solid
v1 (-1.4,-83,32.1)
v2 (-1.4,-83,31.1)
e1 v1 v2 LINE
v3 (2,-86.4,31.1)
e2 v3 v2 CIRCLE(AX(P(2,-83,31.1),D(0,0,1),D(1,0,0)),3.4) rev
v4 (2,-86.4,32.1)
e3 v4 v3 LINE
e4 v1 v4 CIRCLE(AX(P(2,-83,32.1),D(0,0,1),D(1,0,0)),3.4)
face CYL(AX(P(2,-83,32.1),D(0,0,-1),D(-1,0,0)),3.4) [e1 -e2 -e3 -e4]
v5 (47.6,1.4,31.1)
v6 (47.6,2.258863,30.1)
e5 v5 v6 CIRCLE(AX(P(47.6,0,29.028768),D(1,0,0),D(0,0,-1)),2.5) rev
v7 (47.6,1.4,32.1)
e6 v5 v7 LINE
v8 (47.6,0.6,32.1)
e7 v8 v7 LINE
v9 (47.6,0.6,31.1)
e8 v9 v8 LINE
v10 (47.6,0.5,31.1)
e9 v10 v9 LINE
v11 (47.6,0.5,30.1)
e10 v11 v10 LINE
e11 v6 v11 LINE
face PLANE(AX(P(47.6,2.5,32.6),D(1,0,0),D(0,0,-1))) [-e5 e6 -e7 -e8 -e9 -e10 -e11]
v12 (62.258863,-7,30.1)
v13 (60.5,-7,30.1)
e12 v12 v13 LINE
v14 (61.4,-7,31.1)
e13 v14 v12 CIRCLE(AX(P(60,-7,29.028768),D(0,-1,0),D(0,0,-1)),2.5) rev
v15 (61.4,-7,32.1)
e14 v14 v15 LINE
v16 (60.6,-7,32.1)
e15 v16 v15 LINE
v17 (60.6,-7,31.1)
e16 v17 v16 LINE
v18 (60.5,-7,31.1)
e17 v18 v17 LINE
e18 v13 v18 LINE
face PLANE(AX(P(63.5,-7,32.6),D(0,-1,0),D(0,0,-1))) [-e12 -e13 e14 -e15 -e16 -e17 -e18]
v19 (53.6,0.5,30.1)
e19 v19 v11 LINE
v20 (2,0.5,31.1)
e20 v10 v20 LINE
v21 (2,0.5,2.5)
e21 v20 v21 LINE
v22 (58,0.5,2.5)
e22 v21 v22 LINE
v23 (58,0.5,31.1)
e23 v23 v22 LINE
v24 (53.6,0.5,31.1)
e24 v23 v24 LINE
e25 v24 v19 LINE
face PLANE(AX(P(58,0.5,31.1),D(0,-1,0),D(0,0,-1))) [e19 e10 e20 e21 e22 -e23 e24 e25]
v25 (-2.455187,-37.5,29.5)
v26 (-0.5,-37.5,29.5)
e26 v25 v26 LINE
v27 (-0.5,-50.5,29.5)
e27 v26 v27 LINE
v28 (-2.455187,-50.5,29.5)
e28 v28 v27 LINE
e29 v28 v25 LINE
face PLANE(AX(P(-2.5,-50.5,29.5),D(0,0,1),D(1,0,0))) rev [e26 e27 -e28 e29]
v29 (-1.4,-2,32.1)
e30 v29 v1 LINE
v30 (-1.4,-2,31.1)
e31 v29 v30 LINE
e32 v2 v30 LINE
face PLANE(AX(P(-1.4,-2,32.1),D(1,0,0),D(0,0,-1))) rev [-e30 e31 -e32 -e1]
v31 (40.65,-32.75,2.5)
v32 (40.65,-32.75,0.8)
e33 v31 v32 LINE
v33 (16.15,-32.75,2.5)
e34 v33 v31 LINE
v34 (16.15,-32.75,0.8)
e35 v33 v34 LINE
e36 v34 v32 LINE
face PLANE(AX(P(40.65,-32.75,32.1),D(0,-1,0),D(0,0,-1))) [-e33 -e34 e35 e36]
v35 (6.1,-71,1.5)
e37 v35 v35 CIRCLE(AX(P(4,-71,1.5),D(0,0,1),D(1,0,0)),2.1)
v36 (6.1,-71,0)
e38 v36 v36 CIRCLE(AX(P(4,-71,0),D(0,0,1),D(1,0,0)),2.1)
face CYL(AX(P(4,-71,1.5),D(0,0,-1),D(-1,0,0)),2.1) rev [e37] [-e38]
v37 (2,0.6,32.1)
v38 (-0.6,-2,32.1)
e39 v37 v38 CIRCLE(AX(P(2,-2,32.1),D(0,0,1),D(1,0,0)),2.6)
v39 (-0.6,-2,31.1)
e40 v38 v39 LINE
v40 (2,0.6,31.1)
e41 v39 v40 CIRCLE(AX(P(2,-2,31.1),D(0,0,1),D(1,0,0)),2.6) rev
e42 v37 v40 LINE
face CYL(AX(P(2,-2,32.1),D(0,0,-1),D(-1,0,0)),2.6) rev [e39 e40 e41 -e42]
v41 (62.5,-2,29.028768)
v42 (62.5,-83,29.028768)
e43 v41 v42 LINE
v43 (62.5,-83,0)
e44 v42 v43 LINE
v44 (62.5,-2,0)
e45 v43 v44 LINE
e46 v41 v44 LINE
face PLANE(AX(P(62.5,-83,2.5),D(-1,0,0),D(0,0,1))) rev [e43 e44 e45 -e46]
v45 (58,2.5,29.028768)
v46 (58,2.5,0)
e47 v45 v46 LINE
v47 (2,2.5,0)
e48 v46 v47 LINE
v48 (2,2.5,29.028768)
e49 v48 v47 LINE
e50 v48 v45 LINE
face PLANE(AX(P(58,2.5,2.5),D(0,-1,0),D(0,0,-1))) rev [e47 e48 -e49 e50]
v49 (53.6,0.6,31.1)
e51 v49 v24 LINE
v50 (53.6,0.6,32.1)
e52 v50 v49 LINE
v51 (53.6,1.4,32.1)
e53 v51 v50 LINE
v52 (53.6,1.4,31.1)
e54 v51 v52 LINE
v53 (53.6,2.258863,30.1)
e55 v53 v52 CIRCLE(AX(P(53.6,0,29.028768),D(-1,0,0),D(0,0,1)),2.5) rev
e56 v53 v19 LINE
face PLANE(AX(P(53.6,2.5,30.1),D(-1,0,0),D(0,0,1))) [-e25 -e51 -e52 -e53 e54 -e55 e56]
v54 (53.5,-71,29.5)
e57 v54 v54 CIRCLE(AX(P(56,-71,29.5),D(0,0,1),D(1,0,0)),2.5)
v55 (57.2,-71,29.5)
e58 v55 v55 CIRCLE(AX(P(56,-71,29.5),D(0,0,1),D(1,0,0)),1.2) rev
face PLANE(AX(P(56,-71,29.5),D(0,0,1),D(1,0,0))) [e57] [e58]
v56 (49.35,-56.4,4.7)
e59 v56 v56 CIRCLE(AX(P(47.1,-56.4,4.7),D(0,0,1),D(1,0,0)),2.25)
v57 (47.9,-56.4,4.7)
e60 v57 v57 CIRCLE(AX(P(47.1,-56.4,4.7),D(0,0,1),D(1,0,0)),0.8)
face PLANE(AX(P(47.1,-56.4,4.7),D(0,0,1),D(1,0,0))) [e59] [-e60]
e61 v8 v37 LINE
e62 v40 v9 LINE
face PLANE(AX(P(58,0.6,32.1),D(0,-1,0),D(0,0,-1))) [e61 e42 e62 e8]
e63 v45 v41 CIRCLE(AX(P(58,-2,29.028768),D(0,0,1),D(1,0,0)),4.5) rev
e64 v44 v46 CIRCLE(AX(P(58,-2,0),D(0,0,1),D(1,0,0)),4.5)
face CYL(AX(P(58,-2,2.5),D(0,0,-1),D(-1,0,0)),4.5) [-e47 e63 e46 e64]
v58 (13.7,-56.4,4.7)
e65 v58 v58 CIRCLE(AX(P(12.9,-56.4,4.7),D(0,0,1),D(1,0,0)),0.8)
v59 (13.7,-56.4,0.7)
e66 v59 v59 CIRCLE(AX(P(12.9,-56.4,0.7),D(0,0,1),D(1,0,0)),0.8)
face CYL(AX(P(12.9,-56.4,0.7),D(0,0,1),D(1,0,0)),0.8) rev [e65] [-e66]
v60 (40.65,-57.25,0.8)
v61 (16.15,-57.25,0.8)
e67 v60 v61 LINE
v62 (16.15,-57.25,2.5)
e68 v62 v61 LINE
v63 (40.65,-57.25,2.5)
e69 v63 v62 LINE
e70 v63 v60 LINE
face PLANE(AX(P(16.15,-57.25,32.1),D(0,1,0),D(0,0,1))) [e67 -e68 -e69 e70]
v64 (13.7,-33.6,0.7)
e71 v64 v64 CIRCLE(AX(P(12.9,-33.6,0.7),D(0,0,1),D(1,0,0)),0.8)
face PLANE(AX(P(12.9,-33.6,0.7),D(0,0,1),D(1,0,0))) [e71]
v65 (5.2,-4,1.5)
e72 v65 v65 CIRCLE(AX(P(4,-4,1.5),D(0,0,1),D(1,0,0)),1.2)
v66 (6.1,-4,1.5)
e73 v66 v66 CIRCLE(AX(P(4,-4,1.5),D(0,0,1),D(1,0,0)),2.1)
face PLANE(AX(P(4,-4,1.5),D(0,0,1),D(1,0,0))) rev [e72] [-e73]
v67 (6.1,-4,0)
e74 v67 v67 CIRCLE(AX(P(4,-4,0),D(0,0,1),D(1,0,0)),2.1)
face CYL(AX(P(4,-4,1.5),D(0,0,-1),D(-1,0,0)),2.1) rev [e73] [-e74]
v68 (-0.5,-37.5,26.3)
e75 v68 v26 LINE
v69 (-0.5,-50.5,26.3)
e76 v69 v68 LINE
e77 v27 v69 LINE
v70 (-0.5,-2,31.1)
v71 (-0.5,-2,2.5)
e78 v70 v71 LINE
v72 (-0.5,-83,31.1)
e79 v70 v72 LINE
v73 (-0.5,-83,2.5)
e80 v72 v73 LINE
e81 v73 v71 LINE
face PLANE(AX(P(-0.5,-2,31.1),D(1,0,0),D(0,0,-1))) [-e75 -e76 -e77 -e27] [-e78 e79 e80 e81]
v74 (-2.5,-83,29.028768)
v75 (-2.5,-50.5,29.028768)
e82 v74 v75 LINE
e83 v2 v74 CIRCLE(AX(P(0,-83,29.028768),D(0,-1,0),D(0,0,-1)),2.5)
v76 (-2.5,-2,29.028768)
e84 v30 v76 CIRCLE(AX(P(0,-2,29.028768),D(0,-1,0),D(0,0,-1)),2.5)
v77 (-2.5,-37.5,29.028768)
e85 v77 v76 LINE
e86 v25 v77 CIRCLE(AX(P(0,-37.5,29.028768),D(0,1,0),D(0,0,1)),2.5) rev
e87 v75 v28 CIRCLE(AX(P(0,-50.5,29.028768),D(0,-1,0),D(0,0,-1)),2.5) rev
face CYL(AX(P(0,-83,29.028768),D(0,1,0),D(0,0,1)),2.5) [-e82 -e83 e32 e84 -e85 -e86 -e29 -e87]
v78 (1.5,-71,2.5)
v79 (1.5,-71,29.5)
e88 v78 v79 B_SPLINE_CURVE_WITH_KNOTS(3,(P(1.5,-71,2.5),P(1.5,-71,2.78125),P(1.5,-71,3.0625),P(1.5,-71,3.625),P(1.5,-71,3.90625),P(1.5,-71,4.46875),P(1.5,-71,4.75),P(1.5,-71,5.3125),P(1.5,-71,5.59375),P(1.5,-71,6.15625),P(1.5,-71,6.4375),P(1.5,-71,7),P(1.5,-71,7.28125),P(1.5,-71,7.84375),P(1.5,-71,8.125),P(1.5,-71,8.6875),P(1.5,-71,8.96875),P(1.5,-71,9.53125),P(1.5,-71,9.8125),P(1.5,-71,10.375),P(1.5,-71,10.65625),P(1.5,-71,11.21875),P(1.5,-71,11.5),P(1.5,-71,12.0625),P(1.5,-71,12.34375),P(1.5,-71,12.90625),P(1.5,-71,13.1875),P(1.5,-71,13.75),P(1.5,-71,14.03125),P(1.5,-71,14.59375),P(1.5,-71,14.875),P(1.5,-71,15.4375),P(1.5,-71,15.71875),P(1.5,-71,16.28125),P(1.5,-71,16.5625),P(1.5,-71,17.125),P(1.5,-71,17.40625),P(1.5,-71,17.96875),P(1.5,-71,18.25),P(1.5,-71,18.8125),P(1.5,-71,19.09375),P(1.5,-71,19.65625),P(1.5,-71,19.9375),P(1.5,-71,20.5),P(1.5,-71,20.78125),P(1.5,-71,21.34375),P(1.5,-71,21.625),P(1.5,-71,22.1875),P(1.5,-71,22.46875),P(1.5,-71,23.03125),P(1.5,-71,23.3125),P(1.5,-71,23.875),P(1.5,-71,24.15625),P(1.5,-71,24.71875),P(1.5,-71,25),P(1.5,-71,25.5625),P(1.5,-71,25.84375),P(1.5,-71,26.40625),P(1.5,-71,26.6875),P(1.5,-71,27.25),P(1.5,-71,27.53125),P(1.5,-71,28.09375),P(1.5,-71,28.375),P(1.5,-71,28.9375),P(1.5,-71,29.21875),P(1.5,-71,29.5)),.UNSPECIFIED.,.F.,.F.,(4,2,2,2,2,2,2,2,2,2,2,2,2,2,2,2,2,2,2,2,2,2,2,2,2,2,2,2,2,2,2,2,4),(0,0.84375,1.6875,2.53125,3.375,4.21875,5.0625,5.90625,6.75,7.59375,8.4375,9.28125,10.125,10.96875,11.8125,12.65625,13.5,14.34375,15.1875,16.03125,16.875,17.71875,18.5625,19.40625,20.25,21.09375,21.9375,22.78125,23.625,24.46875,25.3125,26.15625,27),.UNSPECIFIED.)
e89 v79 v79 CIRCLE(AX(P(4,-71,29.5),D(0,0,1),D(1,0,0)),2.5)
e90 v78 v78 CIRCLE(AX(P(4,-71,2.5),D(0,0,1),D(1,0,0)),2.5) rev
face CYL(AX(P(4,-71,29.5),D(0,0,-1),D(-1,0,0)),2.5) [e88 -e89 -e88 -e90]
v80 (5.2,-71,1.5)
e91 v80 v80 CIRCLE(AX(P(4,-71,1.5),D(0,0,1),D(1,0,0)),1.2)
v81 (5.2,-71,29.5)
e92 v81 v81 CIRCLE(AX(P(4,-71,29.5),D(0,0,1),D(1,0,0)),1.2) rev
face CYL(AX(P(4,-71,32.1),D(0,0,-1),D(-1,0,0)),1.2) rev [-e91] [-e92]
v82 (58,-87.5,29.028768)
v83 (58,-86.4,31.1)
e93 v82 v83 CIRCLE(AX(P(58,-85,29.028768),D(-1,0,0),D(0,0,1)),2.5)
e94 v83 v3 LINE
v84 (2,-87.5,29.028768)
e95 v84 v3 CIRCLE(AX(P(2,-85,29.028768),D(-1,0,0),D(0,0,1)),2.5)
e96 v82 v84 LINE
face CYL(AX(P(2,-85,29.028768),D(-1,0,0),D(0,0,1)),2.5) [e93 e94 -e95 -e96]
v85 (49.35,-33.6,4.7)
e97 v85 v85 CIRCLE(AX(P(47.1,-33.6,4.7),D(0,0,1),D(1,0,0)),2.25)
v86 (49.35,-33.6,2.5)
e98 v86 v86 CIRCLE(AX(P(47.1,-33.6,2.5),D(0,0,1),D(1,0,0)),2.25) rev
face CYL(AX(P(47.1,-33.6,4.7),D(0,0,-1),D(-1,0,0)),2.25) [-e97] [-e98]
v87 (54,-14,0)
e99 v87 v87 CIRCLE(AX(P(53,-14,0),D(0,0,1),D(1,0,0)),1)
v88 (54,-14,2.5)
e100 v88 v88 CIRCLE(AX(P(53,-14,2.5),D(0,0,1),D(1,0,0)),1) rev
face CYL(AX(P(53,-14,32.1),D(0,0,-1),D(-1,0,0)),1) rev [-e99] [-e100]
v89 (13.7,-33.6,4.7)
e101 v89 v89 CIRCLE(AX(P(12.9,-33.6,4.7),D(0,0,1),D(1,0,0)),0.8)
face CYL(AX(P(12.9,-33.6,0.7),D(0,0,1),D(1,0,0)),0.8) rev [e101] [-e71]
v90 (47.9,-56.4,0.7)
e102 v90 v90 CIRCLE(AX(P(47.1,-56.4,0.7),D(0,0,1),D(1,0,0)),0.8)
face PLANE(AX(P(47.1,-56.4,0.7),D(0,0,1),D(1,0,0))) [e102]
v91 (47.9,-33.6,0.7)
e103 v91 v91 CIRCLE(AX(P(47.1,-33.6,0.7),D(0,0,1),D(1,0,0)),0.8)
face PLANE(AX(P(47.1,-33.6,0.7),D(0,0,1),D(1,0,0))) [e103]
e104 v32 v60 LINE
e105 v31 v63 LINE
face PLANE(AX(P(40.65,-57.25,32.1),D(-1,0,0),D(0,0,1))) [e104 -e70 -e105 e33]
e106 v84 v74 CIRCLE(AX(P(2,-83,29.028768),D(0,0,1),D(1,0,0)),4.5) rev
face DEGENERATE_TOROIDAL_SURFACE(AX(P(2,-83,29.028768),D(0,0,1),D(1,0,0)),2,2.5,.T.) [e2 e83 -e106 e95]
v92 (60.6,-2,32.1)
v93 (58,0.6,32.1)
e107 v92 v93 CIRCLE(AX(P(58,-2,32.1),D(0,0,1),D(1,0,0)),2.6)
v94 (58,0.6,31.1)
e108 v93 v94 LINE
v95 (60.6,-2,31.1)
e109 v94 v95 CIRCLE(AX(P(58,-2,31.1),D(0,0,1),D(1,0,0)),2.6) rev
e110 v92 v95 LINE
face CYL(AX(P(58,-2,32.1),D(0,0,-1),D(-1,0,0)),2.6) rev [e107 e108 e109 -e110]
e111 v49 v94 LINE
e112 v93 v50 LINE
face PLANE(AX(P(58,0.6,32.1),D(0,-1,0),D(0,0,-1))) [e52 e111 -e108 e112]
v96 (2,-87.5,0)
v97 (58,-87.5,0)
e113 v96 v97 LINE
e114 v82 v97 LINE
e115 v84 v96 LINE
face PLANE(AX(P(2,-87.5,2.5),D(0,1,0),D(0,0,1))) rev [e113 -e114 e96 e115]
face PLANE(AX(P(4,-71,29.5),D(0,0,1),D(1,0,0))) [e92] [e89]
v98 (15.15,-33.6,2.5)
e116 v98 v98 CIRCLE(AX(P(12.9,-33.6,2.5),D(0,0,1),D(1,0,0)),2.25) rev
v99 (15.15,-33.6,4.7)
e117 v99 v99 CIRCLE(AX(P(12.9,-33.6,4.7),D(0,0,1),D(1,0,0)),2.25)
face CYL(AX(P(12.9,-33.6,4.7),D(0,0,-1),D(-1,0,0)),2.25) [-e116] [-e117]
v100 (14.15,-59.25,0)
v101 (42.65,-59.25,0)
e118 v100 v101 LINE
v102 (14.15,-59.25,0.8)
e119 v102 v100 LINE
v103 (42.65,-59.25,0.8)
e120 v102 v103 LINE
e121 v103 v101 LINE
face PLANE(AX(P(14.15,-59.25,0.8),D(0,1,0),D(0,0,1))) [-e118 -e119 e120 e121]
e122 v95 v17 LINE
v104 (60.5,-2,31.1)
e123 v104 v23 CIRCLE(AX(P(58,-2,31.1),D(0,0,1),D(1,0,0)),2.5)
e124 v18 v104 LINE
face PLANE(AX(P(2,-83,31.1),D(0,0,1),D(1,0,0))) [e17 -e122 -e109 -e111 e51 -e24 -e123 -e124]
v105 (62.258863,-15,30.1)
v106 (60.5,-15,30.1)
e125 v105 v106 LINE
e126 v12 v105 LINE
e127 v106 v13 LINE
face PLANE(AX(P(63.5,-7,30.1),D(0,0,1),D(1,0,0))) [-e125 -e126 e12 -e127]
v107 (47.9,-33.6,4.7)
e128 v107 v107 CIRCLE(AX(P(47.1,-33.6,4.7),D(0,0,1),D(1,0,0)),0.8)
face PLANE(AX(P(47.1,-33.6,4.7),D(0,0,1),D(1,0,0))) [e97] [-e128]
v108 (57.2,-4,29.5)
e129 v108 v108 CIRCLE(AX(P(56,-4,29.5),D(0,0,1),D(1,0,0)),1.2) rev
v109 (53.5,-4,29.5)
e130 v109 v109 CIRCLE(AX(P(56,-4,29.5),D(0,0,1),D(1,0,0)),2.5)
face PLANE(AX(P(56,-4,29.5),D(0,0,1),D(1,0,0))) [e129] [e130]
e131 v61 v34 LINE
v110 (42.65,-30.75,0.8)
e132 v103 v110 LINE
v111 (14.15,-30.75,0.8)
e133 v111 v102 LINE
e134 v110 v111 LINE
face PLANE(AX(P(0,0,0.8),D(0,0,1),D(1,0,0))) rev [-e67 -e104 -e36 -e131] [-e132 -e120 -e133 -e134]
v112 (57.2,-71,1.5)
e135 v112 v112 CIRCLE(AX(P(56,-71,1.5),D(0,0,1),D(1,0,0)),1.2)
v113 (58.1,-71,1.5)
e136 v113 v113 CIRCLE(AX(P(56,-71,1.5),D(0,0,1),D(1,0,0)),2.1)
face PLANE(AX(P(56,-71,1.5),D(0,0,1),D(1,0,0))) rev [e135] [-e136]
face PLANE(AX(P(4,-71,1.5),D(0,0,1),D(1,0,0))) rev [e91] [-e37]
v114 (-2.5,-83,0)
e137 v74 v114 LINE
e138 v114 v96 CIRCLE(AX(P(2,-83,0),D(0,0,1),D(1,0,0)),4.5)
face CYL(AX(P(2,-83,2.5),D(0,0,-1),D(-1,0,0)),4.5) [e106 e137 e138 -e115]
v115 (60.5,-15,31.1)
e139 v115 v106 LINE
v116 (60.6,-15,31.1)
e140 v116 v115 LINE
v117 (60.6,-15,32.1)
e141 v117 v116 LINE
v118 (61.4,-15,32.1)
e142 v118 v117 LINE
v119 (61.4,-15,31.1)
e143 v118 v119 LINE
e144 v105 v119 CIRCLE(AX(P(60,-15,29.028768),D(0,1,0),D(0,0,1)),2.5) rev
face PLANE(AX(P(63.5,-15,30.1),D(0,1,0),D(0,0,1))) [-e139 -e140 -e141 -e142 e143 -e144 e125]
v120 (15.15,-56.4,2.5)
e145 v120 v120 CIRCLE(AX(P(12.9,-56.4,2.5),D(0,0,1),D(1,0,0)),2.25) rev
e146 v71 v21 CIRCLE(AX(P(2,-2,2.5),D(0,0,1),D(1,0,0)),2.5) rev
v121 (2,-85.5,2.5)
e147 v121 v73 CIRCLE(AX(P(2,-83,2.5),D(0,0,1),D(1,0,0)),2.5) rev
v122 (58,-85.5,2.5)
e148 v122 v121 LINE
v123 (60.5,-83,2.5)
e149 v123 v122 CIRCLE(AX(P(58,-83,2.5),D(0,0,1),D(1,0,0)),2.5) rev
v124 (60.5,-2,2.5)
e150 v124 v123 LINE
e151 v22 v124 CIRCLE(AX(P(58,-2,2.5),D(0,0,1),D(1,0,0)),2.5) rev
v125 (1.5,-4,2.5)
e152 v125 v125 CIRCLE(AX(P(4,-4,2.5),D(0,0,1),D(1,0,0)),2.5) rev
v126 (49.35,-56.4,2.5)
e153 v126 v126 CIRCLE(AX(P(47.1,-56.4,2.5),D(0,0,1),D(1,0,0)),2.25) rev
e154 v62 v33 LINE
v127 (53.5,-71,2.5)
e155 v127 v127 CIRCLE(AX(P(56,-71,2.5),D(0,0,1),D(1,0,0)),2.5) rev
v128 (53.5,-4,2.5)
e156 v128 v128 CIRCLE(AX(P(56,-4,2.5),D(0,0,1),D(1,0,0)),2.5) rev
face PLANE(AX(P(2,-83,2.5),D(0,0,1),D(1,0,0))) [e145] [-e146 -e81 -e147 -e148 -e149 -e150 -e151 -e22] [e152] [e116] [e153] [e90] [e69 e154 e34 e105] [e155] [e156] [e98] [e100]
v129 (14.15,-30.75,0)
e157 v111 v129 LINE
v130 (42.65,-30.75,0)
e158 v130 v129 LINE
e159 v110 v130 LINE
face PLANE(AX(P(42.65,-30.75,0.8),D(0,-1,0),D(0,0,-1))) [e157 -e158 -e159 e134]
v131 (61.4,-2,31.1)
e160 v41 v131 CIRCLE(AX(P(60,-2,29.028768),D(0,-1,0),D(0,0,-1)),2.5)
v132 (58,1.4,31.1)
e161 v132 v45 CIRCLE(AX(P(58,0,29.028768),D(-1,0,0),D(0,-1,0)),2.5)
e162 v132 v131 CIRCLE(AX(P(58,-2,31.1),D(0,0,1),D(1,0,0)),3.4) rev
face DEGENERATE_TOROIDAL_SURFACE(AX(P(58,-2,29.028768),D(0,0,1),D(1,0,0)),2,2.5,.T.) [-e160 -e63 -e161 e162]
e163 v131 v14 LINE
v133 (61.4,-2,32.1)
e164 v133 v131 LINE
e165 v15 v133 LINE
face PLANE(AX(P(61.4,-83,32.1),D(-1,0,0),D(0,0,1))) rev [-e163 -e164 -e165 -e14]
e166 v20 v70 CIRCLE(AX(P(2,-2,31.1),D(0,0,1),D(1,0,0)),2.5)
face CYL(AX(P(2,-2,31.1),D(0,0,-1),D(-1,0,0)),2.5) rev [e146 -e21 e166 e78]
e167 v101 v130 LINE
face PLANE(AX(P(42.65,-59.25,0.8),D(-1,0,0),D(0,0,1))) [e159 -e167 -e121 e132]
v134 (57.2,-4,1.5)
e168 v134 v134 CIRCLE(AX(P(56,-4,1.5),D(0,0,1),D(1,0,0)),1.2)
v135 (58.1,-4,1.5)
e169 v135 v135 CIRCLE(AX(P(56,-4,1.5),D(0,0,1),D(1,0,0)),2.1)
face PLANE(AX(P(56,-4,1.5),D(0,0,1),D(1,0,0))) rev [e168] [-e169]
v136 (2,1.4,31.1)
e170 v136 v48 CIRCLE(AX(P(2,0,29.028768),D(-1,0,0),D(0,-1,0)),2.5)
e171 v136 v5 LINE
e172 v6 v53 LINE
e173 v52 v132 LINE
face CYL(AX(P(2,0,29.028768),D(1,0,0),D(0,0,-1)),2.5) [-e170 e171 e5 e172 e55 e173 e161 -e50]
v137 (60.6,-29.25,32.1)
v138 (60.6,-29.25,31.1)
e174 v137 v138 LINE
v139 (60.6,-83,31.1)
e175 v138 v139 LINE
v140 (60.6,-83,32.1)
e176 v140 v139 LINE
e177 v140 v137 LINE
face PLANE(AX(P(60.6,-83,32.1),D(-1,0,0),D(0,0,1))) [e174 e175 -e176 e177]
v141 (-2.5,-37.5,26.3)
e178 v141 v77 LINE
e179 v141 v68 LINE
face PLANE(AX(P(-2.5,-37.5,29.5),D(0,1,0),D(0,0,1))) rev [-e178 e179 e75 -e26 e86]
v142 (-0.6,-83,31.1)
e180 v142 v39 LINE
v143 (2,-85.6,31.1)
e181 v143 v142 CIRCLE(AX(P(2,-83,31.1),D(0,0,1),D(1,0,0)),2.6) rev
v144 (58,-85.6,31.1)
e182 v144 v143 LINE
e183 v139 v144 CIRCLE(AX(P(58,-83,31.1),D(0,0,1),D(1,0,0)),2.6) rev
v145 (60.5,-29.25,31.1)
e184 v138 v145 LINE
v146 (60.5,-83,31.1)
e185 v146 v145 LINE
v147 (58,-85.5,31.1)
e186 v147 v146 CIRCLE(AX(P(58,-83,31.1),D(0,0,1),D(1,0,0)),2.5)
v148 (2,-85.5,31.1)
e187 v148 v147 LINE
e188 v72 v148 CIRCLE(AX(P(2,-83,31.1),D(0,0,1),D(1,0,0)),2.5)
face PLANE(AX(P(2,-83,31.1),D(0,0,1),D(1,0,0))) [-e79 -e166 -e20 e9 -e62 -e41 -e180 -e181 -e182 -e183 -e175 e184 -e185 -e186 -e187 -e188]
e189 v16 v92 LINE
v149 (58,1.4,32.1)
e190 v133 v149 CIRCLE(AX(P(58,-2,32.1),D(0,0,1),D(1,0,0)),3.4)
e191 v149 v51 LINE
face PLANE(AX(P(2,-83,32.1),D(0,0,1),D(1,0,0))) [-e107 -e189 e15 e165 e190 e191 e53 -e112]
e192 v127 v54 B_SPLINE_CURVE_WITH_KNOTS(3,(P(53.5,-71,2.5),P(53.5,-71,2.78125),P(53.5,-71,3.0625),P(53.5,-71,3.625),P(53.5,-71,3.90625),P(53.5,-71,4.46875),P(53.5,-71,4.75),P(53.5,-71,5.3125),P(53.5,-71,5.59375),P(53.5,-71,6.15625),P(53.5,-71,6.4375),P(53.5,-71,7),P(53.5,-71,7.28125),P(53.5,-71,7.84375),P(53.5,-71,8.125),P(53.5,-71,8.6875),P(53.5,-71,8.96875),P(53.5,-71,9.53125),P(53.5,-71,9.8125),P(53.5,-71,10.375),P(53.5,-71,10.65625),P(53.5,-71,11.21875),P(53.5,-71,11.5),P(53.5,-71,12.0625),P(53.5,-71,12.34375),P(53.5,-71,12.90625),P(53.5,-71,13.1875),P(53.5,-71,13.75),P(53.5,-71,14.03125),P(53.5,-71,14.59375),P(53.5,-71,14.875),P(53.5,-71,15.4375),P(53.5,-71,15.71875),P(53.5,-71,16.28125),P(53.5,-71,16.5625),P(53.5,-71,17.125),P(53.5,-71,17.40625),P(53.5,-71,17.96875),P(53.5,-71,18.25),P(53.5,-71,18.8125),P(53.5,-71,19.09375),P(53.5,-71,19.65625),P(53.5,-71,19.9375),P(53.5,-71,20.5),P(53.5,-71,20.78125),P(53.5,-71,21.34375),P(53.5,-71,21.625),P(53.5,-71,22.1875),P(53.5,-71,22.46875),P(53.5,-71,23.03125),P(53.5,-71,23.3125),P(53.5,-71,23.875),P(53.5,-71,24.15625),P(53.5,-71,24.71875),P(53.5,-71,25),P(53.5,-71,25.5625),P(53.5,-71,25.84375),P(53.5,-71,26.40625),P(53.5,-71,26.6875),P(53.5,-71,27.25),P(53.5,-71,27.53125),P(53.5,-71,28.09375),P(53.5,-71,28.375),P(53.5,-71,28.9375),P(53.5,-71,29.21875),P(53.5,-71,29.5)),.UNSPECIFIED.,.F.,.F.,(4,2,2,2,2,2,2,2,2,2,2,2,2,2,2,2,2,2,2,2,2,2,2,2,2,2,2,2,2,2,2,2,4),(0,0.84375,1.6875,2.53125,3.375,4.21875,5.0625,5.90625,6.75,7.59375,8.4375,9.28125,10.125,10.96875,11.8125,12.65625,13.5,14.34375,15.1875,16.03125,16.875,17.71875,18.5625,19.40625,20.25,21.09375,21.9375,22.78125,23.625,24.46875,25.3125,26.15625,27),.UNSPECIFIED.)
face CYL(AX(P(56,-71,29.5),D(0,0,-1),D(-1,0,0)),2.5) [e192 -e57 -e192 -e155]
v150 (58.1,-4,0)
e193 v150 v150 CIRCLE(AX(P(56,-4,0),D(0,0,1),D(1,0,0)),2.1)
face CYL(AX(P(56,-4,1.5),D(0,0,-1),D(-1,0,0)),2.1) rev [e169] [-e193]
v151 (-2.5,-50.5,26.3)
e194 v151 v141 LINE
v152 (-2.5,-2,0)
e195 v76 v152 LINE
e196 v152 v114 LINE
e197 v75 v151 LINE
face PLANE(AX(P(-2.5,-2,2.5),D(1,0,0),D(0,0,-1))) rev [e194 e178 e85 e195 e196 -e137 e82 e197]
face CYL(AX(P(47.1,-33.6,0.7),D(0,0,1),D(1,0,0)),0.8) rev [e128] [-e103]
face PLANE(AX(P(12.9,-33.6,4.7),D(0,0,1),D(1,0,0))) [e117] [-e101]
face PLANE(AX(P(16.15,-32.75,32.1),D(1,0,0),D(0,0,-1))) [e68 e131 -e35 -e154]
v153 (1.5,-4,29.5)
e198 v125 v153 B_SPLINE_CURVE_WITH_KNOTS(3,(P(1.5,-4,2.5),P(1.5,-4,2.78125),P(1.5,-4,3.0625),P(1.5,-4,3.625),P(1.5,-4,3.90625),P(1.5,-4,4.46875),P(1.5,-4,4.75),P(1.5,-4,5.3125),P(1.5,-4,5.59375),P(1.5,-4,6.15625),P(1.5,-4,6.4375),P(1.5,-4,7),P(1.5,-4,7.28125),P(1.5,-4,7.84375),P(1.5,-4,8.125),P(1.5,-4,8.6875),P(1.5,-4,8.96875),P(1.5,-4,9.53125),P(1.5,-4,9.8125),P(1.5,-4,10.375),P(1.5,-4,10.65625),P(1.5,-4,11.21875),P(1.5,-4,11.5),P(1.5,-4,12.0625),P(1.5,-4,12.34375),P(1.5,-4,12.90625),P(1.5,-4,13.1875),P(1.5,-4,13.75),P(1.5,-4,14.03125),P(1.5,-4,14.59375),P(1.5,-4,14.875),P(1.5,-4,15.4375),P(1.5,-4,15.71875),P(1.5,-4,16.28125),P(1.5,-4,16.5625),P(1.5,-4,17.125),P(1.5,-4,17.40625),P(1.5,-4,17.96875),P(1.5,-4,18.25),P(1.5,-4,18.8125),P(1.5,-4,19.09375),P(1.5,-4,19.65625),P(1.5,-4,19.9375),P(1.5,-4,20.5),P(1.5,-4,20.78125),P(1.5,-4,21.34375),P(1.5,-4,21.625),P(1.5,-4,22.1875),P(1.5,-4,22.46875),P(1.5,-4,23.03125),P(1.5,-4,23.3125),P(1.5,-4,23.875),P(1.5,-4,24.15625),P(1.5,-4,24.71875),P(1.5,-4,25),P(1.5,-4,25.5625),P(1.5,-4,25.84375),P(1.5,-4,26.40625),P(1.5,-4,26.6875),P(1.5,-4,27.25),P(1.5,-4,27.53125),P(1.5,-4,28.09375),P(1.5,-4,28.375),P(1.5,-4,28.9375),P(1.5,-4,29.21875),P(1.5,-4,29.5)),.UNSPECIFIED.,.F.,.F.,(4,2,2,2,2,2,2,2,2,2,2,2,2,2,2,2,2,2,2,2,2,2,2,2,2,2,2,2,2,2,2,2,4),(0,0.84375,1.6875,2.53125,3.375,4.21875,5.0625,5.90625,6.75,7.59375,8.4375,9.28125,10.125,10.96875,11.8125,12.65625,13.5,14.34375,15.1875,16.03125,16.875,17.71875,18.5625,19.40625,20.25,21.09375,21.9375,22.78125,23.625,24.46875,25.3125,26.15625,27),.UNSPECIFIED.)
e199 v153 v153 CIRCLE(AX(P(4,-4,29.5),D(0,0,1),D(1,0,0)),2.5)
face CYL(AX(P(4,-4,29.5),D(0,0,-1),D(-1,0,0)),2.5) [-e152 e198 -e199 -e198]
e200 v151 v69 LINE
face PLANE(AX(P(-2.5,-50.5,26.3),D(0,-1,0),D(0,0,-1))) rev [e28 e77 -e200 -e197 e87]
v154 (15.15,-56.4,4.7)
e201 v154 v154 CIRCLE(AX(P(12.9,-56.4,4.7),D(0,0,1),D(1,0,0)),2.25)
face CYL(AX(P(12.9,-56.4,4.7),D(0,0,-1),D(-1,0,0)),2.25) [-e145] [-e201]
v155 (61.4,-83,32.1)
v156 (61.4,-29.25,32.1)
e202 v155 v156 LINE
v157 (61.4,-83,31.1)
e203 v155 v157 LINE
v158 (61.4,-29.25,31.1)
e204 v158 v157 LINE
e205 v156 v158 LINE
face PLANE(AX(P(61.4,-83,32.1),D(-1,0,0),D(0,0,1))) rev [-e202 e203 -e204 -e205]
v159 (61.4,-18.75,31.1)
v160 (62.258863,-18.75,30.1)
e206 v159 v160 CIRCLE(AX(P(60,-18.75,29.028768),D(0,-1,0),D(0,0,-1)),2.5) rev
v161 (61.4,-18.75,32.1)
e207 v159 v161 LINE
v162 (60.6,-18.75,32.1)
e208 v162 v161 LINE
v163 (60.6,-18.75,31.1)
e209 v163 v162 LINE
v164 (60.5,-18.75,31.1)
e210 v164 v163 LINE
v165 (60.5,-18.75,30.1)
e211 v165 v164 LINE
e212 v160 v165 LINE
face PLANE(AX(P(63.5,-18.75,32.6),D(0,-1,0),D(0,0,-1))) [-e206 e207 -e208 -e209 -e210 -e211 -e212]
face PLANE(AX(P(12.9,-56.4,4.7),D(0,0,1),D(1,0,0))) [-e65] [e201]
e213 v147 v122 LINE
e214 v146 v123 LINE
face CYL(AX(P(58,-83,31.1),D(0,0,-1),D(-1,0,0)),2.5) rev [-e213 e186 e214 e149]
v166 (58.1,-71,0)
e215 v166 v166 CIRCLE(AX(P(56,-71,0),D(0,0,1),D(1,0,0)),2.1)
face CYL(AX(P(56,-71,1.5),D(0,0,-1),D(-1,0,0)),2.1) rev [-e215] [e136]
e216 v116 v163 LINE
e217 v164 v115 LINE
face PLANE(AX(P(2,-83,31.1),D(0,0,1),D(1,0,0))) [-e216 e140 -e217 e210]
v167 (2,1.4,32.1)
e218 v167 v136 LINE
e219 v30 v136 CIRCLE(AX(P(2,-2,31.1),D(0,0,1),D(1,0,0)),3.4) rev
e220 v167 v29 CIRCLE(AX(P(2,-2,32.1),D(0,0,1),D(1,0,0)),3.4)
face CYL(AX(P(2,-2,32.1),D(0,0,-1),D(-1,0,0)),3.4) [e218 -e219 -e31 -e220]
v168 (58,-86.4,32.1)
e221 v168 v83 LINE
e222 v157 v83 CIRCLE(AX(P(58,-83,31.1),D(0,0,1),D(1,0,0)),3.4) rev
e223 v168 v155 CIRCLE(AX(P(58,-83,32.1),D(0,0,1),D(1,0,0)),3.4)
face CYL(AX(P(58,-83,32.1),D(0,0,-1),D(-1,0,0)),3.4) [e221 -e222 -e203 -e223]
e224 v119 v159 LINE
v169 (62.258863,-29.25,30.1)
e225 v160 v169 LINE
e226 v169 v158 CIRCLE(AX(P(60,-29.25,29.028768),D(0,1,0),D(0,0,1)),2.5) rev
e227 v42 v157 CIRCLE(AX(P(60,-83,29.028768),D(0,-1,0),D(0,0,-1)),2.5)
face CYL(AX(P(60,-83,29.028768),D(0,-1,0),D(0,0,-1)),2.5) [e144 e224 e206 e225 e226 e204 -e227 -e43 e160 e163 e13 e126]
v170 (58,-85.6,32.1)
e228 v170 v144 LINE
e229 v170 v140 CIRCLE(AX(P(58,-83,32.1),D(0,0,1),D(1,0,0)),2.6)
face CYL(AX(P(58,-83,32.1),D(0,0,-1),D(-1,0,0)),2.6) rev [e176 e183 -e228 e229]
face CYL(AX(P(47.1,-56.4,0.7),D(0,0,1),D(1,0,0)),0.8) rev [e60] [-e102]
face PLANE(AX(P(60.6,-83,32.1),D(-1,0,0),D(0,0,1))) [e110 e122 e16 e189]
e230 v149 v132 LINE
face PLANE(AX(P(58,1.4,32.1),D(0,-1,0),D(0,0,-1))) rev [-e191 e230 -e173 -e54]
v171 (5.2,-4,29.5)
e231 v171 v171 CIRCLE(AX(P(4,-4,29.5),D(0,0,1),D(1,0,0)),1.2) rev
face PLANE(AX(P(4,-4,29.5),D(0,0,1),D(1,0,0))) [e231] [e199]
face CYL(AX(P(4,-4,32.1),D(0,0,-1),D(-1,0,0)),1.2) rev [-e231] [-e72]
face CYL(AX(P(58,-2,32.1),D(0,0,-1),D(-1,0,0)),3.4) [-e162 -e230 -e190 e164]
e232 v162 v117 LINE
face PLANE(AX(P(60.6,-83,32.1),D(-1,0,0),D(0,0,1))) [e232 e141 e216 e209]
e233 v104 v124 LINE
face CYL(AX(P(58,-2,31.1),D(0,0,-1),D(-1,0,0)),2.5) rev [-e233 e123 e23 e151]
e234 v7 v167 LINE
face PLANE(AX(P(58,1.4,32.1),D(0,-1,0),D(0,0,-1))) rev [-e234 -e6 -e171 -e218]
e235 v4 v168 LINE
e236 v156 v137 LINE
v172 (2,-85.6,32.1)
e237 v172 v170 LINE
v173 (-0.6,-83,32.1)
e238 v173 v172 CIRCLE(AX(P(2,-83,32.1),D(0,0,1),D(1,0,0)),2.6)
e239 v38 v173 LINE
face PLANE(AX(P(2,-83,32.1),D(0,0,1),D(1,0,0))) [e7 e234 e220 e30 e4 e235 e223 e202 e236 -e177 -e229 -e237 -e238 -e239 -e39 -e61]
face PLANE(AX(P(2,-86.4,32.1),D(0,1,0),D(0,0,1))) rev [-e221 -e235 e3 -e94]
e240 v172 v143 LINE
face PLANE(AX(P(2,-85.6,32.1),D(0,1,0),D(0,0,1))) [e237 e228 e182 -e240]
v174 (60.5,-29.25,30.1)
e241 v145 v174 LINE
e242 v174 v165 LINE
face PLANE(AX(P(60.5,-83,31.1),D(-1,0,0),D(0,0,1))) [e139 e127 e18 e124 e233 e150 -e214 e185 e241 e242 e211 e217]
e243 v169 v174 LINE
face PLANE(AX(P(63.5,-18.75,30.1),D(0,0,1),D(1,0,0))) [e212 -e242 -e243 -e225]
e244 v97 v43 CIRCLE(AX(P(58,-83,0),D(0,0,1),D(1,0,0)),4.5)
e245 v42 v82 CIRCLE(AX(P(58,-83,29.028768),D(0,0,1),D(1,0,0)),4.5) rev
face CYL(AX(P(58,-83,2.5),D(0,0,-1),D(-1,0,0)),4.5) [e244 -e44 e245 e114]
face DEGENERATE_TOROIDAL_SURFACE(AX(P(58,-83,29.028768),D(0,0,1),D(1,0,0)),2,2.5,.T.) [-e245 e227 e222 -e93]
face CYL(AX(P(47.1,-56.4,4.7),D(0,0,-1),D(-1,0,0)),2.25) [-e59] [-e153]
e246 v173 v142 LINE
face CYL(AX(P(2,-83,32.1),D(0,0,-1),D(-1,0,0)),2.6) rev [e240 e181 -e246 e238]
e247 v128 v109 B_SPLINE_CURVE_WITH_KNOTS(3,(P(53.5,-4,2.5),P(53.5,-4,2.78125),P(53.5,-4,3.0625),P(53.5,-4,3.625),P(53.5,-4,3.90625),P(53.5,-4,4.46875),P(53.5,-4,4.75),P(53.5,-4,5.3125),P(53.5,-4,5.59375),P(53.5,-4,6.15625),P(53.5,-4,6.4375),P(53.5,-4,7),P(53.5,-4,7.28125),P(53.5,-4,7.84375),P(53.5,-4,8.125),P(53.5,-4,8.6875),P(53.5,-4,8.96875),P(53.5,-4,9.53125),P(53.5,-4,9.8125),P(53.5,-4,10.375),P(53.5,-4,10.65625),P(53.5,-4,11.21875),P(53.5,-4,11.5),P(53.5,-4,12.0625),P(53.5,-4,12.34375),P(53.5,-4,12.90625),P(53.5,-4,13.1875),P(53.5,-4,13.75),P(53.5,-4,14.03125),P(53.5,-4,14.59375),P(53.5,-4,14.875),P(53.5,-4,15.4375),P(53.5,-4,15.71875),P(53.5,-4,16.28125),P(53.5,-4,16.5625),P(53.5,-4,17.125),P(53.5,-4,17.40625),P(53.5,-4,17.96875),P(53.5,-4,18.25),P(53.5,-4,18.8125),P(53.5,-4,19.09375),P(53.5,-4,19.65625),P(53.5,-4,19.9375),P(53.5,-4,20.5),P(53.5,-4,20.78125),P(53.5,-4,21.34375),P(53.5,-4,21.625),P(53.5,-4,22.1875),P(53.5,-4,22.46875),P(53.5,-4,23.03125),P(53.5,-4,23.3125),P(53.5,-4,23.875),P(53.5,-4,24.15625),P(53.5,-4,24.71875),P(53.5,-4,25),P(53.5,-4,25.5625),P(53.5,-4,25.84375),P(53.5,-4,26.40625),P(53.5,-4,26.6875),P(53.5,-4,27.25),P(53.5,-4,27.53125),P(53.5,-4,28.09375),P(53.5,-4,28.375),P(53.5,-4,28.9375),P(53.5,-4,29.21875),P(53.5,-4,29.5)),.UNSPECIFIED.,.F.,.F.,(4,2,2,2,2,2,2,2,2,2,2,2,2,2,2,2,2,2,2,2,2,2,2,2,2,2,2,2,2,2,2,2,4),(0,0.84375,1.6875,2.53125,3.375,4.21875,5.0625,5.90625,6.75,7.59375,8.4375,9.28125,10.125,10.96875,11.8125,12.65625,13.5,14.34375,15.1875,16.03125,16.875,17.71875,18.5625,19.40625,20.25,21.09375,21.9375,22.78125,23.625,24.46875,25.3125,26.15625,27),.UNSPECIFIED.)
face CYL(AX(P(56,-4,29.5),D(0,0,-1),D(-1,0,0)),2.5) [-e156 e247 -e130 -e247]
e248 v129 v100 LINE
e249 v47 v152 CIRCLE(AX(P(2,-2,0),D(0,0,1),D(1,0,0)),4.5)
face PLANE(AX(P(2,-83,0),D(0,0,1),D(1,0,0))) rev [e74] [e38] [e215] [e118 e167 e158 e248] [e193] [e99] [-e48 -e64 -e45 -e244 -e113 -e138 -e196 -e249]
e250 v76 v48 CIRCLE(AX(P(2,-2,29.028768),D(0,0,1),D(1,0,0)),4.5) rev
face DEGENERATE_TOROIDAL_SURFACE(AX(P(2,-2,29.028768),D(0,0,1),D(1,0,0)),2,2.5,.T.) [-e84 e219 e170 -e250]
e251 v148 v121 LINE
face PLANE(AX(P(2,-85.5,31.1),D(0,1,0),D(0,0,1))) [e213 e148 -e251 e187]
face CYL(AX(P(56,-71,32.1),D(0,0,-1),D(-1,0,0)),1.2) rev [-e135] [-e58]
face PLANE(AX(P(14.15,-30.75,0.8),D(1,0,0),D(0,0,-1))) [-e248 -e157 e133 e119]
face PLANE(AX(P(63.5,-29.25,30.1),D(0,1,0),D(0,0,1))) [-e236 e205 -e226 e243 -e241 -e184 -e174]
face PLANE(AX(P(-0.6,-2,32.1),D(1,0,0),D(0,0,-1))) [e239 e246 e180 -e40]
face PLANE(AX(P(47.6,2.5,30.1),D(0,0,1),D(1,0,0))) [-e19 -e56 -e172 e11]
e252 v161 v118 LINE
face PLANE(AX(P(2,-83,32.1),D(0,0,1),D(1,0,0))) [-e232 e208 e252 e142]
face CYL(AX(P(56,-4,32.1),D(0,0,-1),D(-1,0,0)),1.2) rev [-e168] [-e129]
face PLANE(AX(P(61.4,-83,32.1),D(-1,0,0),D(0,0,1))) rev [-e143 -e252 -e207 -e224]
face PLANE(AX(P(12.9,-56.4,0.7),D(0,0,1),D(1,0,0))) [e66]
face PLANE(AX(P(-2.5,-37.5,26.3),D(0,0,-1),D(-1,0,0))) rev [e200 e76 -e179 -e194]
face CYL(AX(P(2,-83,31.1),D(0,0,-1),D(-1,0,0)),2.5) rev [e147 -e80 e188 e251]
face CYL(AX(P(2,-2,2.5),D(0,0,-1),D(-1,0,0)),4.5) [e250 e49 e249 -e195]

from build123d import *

# Parameters (mm, degrees)
FLOOR_2_DEPTH                     = 2.5
WALL_OUTER_HALF_DEPTH             = 31.1
WALL_INNER_HALF_DEPTH             = 31.1
LIP_DEPTH                         = 32.1
SCREEN_FACE_ROUND_OVER_R          = 2.5
SKETCH_5_R                        = 2.5
STANDOFFS_DEPTH                   = 29.5
SKETCH_6_R                        = 1.2
SCREW_BORES_DEPTH                 = 113.218135789
SKETCH_7_R                        = 2.1
SCREW_HEAD_RECESSES_DEPTH         = 1.5
SKETCH_8_R                        = 2.25
DISPLAY_POSTS_DEPTH               = 4.7
DISPLAY_START                     = 4.7
SKETCH_9_R                        = 0.8
DISPLAY_POST_PILOT_HOLES_M2_DEPTH = 4
SKETCH_10_W                       = 28.5
SKETCH_10_H                       = 28.5
SCREEN_FRAME_RECESS_DEPTH         = 0.8
SKETCH_11_W                       = 24.5
SKETCH_11_H                       = 24.5
DISPLAY_WINDOW_DEPTH              = 113.218135789
SKETCH_12_R                       = 1
CHARGE_LED_HOLE_D2_DEPTH          = 113.218135789
SKETCH_13_W                       = 3.2
SKETCH_13_H                       = 13
MICROSD_SLOT_DEPTH                = 113.218135789
USB_C_START                       = 59
SKETCH_14_W                       = 2.5
SKETCH_14_H                       = 10.5
USB_C_LIP_NOTCH_DEPTH             = 4.5
SWITCH_START                      = 59
SKETCH_15_W                       = 2.5
SKETCH_15_H                       = 8
SWITCH_LIP_NOTCH_DEPTH            = 4.5
SKETCH_16_W                       = 6
SKETCH_16_H                       = 2.5
SHUTTER_LIP_NOTCH_DEPTH           = 113.218135789


with BuildPart() as part:
    # 草圖1 → floor 2 (new body)
    with BuildSketch(Plane.XY):
        with BuildLine():
            Line((2, -87.5), (58, -87.5))
            ThreePointArc((58, -87.5), (61.181980515, -86.181980515), (62.5, -83))
            Line((62.5, -83), (62.5, -2))
            ThreePointArc((62.5, -2), (61.181980515, 1.181980515), (58, 2.5))
            Line((58, 2.5), (2, 2.5))
            ThreePointArc((2, 2.5), (-1.181980515, 1.181980515), (-2.5, -2))
            Line((-2.5, -2), (-2.5, -83))
            ThreePointArc((-2.5, -83), (-1.181980515, -86.181980515), (2, -87.5))
        make_face()
    extrude(amount=FLOOR_2_DEPTH)

    # 草圖2 → wall outer half (add)
    with BuildSketch(Plane.XY):
        with BuildLine():
            Line((2, -87.5), (58, -87.5))
            ThreePointArc((58, -87.5), (61.181980515, -86.181980515), (62.5, -83))
            Line((62.5, -83), (62.5, -2))
            ThreePointArc((62.5, -2), (61.181980515, 1.181980515), (58, 2.5))
            Line((58, 2.5), (2, 2.5))
            ThreePointArc((2, 2.5), (-1.181980515, 1.181980515), (-2.5, -2))
            Line((-2.5, -2), (-2.5, -83))
            ThreePointArc((-2.5, -83), (-1.181980515, -86.181980515), (2, -87.5))
        make_face()
        with BuildLine():
            Line((2, -86.5), (58, -86.5))
            ThreePointArc((58, -86.5), (60.474873734, -85.474873734), (61.5, -83))
            Line((61.5, -83), (61.5, -2))
            ThreePointArc((61.5, -2), (60.474873734, 0.474873734), (58, 1.5))
            Line((58, 1.5), (2, 1.5))
            ThreePointArc((2, 1.5), (-0.474873734, 0.474873734), (-1.5, -2))
            Line((-1.5, -2), (-1.5, -83))
            ThreePointArc((-1.5, -83), (-0.474873734, -85.474873734), (2, -86.5))
        make_face(mode=Mode.SUBTRACT)
    extrude(amount=WALL_OUTER_HALF_DEPTH)

    # 草圖3 → wall inner half (add)
    with BuildSketch(Plane.XY):
        with BuildLine():
            Line((2, -86.5), (58, -86.5))
            ThreePointArc((58, -86.5), (60.474873734, -85.474873734), (61.5, -83))
            Line((61.5, -83), (61.5, -2))
            ThreePointArc((61.5, -2), (60.474873734, 0.474873734), (58, 1.5))
            Line((58, 1.5), (2, 1.5))
            ThreePointArc((2, 1.5), (-0.474873734, 0.474873734), (-1.5, -2))
            Line((-1.5, -2), (-1.5, -83))
            ThreePointArc((-1.5, -83), (-0.474873734, -85.474873734), (2, -86.5))
        make_face()
        with BuildLine():
            Line((2, -85.5), (58, -85.5))
            ThreePointArc((58, -85.5), (59.767766953, -84.767766953), (60.5, -83))
            Line((60.5, -83), (60.5, -2))
            ThreePointArc((60.5, -2), (59.767766953, -0.232233047), (58, 0.5))
            Line((58, 0.5), (2, 0.5))
            ThreePointArc((2, 0.5), (0.232233047, -0.232233047), (-0.5, -2))
            Line((-0.5, -2), (-0.5, -83))
            ThreePointArc((-0.5, -83), (0.232233047, -84.767766953), (2, -85.5))
        make_face(mode=Mode.SUBTRACT)
    extrude(amount=WALL_INNER_HALF_DEPTH)

    # 草圖4 → lip (add)
    with BuildSketch(Plane.XY):
        with BuildLine():
            Line((2, -86.4), (58, -86.4))
            ThreePointArc((58, -86.4), (60.404163056, -85.404163056), (61.4, -83))
            Line((61.4, -83), (61.4, -2))
            ThreePointArc((61.4, -2), (60.404163056, 0.404163056), (58, 1.4))
            Line((58, 1.4), (2, 1.4))
            ThreePointArc((2, 1.4), (-0.404163056, 0.404163056), (-1.4, -2))
            Line((-1.4, -2), (-1.4, -83))
            ThreePointArc((-1.4, -83), (-0.404163056, -85.404163056), (2, -86.4))
        make_face()
        with BuildLine():
            Line((2, -85.6), (58, -85.6))
            ThreePointArc((58, -85.6), (59.838477631, -84.838477631), (60.6, -83))
            Line((60.6, -83), (60.6, -2))
            ThreePointArc((60.6, -2), (59.838477631, -0.161522369), (58, 0.6))
            Line((58, 0.6), (2, 0.6))
            ThreePointArc((2, 0.6), (0.161522369, -0.161522369), (-0.6, -2))
            Line((-0.6, -2), (-0.6, -83))
            ThreePointArc((-0.6, -83), (0.161522369, -84.838477631), (2, -85.6))
        make_face(mode=Mode.SUBTRACT)
    extrude(amount=LIP_DEPTH)

    # screen face round-over
    # the kernel refuses this fillet: 2.5 mm, written as the material it takes off along each edge
    with BuildSketch(Plane(origin=(2, -83, 31.1), x_dir=(-1, 0, 0), z_dir=(0, 1, 0))) as screen_face_round_over_piece_1:
        with BuildLine():
            CenterArc((2, -2.071231518), SCREEN_FACE_ROUND_OVER_R, 0, 55.944202257)
            Line((3.4, 0), (3.428, 0.04142463))
            ThreePointArc((3.428, 0.04142463), (3.95, 0.05), (4.5, 0.05))
            Line((4.5, 0.05), (4.55, 0))
            Line((4.55, 0), (4.55, -2.071231518))
            Line((4.55, -2.071231518), (4.5, -2.071231518))
        make_face()
    revolve(axis=Axis((2, -83, 31.1), (0, 0, 1)), revolution_arc=90, mode=Mode.SUBTRACT)
    with BuildSketch(Plane(origin=(2, -87.5, 31.1), x_dir=(0, 1.0, -2.745278751795259e-12), z_dir=(1, 0, 0)), Plane(origin=(58, 2.5, 31.1), x_dir=(0, -1.0, -2.7452787517952908e-12), z_dir=(-1, 0, 0))) as screen_face_round_over_piece_2:
        with BuildLine():
            CenterArc((2.5, -2.071231518), SCREEN_FACE_ROUND_OVER_R, 124.055797743, 55.944202257)
            Line((0, -2.071231518), (-0.05, -2.071231518))
            Line((-0.05, -2.071231518), (-0.05, 0))
            Line((-0.05, 0), (0, 0.05))
            ThreePointArc((0, 0.05), (0.55, 0.05), (1.072, 0.04142463))
            Line((1.072, 0.04142463), (1.1, 0))
        make_face()
    extrude(amount=56, mode=Mode.SUBTRACT)
    with BuildSketch(Plane(origin=(58, -83, 31.1), x_dir=(0, -1, 0), z_dir=(-1, 0, 0))) as screen_face_round_over_piece_3:
        with BuildLine():
            CenterArc((2, -2.071231518), SCREEN_FACE_ROUND_OVER_R, 0, 55.944202257)
            Line((4.5, -2.071231518), (4.55, -2.071231518))
            Line((4.55, -2.071231518), (4.55, 0))
            Line((4.55, 0), (4.5, 0.05))
            ThreePointArc((4.5, 0.05), (3.95, 0.05), (3.428, 0.04142463))
            Line((3.428, 0.04142463), (3.4, 0))
        make_face()
    revolve(axis=Axis((58, -83, 31.1), (0, 0, 1)), revolution_arc=90, mode=Mode.SUBTRACT)
    with BuildSketch(Plane(origin=(62.5, -83, 31.1), x_dir=(-1.0, 0, -2.7452787517953118e-12), z_dir=(0, 1, 0))) as screen_face_round_over_piece_4:
        with BuildLine():
            CenterArc((2.5, -2.071231518), SCREEN_FACE_ROUND_OVER_R, 124.055797743, 55.944202257)
            Line((0, -2.071231518), (-0.05, -2.071231518))
            Line((-0.05, -2.071231518), (-0.05, 0))
            Line((-0.05, 0), (0, 0.05))
            ThreePointArc((0, 0.05), (0.55, 0.05), (1.072, 0.04142463))
            Line((1.072, 0.04142463), (1.1, 0))
        make_face()
    extrude(amount=81, mode=Mode.SUBTRACT)
    with BuildSketch(Plane(origin=(58, -2, 31.1), x_dir=(1, 0, 0), z_dir=(0, -1, 0))) as screen_face_round_over_piece_5:
        with BuildLine():
            CenterArc((2, -2.071231518), SCREEN_FACE_ROUND_OVER_R, 0, 55.944202257)
            Line((4.5, -2.071231518), (4.55, -2.071231518))
            Line((4.55, -2.071231518), (4.55, 0))
            Line((4.55, 0), (4.5, 0.05))
            ThreePointArc((4.5, 0.05), (3.95, 0.05), (3.428, 0.04142463))
            Line((3.428, 0.04142463), (3.4, 0))
        make_face()
    revolve(axis=Axis((58, -2, 31.1), (0, 0, 1)), revolution_arc=90, mode=Mode.SUBTRACT)
    with BuildSketch(Plane(origin=(2, -2, 31.1), x_dir=(0, 1, 0), z_dir=(1, 0, 0))) as screen_face_round_over_piece_6:
        with BuildLine():
            CenterArc((2, -2.071231518), SCREEN_FACE_ROUND_OVER_R, 0, 55.944202257)
            Line((4.5, -2.071231518), (4.55, -2.071231518))
            Line((4.55, -2.071231518), (4.55, 0))
            Line((4.55, 0), (4.5, 0.05))
            ThreePointArc((4.5, 0.05), (3.95, 0.05), (3.428, 0.04142463))
            Line((3.428, 0.04142463), (3.4, 0))
        make_face()
    revolve(axis=Axis((2, -2, 31.1), (0, 0, 1)), revolution_arc=90, mode=Mode.SUBTRACT)
    with BuildSketch(Plane(origin=(-2.5, -2, 31.1), x_dir=(0, 0, -1), z_dir=(0, -1, 0))) as screen_face_round_over_piece_7:
        with BuildLine():
            CenterArc((2.071231518, 2.5), SCREEN_FACE_ROUND_OVER_R, 214.055797743, 55.944202257)
            Line((0, 1.1), (-0.04142463, 1.072))
            ThreePointArc((-0.04142463, 1.072), (-0.05, 0.55), (-0.05, 0))
            Line((-0.05, 0), (0, -0.05))
            Line((0, -0.05), (2.071231518, -0.05))
            Line((2.071231518, -0.05), (2.071231518, 0))
        make_face()
    extrude(amount=81, mode=Mode.SUBTRACT)

    # 草圖5 → standoffs (add)
    with BuildSketch(Plane.XY):
        with Locations(Location((4, -4, 0), (0, 0, 180))):
            Circle(SKETCH_5_R)
        with Locations(Location((56, -4, 0), (0, 0, 180))):
            Circle(SKETCH_5_R)
        with Locations(Location((4, -71, 0), (0, 0, 180))):
            Circle(SKETCH_5_R)
        with Locations(Location((56, -71, 0), (0, 0, 180))):
            Circle(SKETCH_5_R)
    extrude(amount=STANDOFFS_DEPTH)

    # 草圖6 → screw bores (cut, through all)
    with BuildSketch(Plane.XY):
        with Locations((4, -4)):
            Circle(SKETCH_6_R)
        with Locations((56, -4)):
            Circle(SKETCH_6_R)
        with Locations((4, -71)):
            Circle(SKETCH_6_R)
        with Locations((56, -71)):
            Circle(SKETCH_6_R)
    extrude(amount=SCREW_BORES_DEPTH, mode=Mode.SUBTRACT)

    # 草圖7 → screw head recesses (cut)
    with BuildSketch(Plane.XY):
        with Locations((4, -4)):
            Circle(SKETCH_7_R)
        with Locations((56, -4)):
            Circle(SKETCH_7_R)
        with Locations((4, -71)):
            Circle(SKETCH_7_R)
        with Locations((56, -71)):
            Circle(SKETCH_7_R)
    extrude(amount=SCREW_HEAD_RECESSES_DEPTH, mode=Mode.SUBTRACT)

    # 草圖8 → display posts (add)
    with BuildSketch(Plane.XY):
        with Locations((12.9, -33.6)):
            Circle(SKETCH_8_R)
        with Locations((12.9, -56.4)):
            Circle(SKETCH_8_R)
        with Locations((47.1, -33.6)):
            Circle(SKETCH_8_R)
        with Locations((47.1, -56.4)):
            Circle(SKETCH_8_R)
    extrude(amount=DISPLAY_POSTS_DEPTH)

    # 草圖9 → display post pilot holes M2 (cut)
    with BuildSketch(Plane.XY.offset(DISPLAY_START)):
        with Locations((12.9, -33.6)):
            Circle(SKETCH_9_R)
        with Locations((12.9, -56.4)):
            Circle(SKETCH_9_R)
        with Locations((47.1, -33.6)):
            Circle(SKETCH_9_R)
        with Locations((47.1, -56.4)):
            Circle(SKETCH_9_R)
    extrude(amount=-DISPLAY_POST_PILOT_HOLES_M2_DEPTH, mode=Mode.SUBTRACT)

    # 草圖10 → screen frame recess (cut)
    with BuildSketch(Plane.XY):
        with Locations((28.4, -45)):
            Rectangle(SKETCH_10_W, SKETCH_10_H)
    extrude(amount=SCREEN_FRAME_RECESS_DEPTH, mode=Mode.SUBTRACT)

    # 草圖11 → display window (cut, through all)
    with BuildSketch(Plane.XY):
        with Locations((28.4, -45)):
            Rectangle(SKETCH_11_W, SKETCH_11_H)
    extrude(amount=DISPLAY_WINDOW_DEPTH, mode=Mode.SUBTRACT)

    # 草圖12 → charge LED hole D2 (cut, through all)
    with BuildSketch(Plane.XY):
        with Locations((53, -14)):
            Circle(SKETCH_12_R)
    extrude(amount=CHARGE_LED_HOLE_D2_DEPTH, mode=Mode.SUBTRACT)

    # 草圖13 → microSD slot (cut, through all)
    with BuildSketch(Plane(origin=(0, 0, 0), x_dir=(0, 0, -1), z_dir=(1, 0, 0))):
        with Locations((-27.9, -44)):
            Rectangle(SKETCH_13_W, SKETCH_13_H)
    extrude(amount=-MICROSD_SLOT_DEPTH, mode=Mode.SUBTRACT)

    # 草圖14 → USB-C lip notch (cut)
    with BuildSketch(Plane(origin=(0, 0, 0), x_dir=(0, 0, -1), z_dir=(1, 0, 0)).offset(USB_C_START)):
        with Locations((-31.35, -24)):
            Rectangle(SKETCH_14_W, SKETCH_14_H)
    extrude(amount=USB_C_LIP_NOTCH_DEPTH, mode=Mode.SUBTRACT)

    # 草圖15 → switch lip notch (cut)
    with BuildSketch(Plane(origin=(0, 0, 0), x_dir=(0, 0, -1), z_dir=(1, 0, 0)).offset(SWITCH_START)):
        with Locations((-31.35, -11)):
            Rectangle(SKETCH_15_W, SKETCH_15_H)
    extrude(amount=SWITCH_LIP_NOTCH_DEPTH, mode=Mode.SUBTRACT)

    # 草圖16 → shutter lip notch (cut, through all)
    with BuildSketch(Plane(origin=(0, 0, 0), x_dir=(1, 0, 0), z_dir=(0, 1, 0))):
        with Locations((50.6, -31.35)):
            Rectangle(SKETCH_16_W, SKETCH_16_H)
    extrude(amount=SHUTTER_LIP_NOTCH_DEPTH, mode=Mode.SUBTRACT)


solid = part.part
